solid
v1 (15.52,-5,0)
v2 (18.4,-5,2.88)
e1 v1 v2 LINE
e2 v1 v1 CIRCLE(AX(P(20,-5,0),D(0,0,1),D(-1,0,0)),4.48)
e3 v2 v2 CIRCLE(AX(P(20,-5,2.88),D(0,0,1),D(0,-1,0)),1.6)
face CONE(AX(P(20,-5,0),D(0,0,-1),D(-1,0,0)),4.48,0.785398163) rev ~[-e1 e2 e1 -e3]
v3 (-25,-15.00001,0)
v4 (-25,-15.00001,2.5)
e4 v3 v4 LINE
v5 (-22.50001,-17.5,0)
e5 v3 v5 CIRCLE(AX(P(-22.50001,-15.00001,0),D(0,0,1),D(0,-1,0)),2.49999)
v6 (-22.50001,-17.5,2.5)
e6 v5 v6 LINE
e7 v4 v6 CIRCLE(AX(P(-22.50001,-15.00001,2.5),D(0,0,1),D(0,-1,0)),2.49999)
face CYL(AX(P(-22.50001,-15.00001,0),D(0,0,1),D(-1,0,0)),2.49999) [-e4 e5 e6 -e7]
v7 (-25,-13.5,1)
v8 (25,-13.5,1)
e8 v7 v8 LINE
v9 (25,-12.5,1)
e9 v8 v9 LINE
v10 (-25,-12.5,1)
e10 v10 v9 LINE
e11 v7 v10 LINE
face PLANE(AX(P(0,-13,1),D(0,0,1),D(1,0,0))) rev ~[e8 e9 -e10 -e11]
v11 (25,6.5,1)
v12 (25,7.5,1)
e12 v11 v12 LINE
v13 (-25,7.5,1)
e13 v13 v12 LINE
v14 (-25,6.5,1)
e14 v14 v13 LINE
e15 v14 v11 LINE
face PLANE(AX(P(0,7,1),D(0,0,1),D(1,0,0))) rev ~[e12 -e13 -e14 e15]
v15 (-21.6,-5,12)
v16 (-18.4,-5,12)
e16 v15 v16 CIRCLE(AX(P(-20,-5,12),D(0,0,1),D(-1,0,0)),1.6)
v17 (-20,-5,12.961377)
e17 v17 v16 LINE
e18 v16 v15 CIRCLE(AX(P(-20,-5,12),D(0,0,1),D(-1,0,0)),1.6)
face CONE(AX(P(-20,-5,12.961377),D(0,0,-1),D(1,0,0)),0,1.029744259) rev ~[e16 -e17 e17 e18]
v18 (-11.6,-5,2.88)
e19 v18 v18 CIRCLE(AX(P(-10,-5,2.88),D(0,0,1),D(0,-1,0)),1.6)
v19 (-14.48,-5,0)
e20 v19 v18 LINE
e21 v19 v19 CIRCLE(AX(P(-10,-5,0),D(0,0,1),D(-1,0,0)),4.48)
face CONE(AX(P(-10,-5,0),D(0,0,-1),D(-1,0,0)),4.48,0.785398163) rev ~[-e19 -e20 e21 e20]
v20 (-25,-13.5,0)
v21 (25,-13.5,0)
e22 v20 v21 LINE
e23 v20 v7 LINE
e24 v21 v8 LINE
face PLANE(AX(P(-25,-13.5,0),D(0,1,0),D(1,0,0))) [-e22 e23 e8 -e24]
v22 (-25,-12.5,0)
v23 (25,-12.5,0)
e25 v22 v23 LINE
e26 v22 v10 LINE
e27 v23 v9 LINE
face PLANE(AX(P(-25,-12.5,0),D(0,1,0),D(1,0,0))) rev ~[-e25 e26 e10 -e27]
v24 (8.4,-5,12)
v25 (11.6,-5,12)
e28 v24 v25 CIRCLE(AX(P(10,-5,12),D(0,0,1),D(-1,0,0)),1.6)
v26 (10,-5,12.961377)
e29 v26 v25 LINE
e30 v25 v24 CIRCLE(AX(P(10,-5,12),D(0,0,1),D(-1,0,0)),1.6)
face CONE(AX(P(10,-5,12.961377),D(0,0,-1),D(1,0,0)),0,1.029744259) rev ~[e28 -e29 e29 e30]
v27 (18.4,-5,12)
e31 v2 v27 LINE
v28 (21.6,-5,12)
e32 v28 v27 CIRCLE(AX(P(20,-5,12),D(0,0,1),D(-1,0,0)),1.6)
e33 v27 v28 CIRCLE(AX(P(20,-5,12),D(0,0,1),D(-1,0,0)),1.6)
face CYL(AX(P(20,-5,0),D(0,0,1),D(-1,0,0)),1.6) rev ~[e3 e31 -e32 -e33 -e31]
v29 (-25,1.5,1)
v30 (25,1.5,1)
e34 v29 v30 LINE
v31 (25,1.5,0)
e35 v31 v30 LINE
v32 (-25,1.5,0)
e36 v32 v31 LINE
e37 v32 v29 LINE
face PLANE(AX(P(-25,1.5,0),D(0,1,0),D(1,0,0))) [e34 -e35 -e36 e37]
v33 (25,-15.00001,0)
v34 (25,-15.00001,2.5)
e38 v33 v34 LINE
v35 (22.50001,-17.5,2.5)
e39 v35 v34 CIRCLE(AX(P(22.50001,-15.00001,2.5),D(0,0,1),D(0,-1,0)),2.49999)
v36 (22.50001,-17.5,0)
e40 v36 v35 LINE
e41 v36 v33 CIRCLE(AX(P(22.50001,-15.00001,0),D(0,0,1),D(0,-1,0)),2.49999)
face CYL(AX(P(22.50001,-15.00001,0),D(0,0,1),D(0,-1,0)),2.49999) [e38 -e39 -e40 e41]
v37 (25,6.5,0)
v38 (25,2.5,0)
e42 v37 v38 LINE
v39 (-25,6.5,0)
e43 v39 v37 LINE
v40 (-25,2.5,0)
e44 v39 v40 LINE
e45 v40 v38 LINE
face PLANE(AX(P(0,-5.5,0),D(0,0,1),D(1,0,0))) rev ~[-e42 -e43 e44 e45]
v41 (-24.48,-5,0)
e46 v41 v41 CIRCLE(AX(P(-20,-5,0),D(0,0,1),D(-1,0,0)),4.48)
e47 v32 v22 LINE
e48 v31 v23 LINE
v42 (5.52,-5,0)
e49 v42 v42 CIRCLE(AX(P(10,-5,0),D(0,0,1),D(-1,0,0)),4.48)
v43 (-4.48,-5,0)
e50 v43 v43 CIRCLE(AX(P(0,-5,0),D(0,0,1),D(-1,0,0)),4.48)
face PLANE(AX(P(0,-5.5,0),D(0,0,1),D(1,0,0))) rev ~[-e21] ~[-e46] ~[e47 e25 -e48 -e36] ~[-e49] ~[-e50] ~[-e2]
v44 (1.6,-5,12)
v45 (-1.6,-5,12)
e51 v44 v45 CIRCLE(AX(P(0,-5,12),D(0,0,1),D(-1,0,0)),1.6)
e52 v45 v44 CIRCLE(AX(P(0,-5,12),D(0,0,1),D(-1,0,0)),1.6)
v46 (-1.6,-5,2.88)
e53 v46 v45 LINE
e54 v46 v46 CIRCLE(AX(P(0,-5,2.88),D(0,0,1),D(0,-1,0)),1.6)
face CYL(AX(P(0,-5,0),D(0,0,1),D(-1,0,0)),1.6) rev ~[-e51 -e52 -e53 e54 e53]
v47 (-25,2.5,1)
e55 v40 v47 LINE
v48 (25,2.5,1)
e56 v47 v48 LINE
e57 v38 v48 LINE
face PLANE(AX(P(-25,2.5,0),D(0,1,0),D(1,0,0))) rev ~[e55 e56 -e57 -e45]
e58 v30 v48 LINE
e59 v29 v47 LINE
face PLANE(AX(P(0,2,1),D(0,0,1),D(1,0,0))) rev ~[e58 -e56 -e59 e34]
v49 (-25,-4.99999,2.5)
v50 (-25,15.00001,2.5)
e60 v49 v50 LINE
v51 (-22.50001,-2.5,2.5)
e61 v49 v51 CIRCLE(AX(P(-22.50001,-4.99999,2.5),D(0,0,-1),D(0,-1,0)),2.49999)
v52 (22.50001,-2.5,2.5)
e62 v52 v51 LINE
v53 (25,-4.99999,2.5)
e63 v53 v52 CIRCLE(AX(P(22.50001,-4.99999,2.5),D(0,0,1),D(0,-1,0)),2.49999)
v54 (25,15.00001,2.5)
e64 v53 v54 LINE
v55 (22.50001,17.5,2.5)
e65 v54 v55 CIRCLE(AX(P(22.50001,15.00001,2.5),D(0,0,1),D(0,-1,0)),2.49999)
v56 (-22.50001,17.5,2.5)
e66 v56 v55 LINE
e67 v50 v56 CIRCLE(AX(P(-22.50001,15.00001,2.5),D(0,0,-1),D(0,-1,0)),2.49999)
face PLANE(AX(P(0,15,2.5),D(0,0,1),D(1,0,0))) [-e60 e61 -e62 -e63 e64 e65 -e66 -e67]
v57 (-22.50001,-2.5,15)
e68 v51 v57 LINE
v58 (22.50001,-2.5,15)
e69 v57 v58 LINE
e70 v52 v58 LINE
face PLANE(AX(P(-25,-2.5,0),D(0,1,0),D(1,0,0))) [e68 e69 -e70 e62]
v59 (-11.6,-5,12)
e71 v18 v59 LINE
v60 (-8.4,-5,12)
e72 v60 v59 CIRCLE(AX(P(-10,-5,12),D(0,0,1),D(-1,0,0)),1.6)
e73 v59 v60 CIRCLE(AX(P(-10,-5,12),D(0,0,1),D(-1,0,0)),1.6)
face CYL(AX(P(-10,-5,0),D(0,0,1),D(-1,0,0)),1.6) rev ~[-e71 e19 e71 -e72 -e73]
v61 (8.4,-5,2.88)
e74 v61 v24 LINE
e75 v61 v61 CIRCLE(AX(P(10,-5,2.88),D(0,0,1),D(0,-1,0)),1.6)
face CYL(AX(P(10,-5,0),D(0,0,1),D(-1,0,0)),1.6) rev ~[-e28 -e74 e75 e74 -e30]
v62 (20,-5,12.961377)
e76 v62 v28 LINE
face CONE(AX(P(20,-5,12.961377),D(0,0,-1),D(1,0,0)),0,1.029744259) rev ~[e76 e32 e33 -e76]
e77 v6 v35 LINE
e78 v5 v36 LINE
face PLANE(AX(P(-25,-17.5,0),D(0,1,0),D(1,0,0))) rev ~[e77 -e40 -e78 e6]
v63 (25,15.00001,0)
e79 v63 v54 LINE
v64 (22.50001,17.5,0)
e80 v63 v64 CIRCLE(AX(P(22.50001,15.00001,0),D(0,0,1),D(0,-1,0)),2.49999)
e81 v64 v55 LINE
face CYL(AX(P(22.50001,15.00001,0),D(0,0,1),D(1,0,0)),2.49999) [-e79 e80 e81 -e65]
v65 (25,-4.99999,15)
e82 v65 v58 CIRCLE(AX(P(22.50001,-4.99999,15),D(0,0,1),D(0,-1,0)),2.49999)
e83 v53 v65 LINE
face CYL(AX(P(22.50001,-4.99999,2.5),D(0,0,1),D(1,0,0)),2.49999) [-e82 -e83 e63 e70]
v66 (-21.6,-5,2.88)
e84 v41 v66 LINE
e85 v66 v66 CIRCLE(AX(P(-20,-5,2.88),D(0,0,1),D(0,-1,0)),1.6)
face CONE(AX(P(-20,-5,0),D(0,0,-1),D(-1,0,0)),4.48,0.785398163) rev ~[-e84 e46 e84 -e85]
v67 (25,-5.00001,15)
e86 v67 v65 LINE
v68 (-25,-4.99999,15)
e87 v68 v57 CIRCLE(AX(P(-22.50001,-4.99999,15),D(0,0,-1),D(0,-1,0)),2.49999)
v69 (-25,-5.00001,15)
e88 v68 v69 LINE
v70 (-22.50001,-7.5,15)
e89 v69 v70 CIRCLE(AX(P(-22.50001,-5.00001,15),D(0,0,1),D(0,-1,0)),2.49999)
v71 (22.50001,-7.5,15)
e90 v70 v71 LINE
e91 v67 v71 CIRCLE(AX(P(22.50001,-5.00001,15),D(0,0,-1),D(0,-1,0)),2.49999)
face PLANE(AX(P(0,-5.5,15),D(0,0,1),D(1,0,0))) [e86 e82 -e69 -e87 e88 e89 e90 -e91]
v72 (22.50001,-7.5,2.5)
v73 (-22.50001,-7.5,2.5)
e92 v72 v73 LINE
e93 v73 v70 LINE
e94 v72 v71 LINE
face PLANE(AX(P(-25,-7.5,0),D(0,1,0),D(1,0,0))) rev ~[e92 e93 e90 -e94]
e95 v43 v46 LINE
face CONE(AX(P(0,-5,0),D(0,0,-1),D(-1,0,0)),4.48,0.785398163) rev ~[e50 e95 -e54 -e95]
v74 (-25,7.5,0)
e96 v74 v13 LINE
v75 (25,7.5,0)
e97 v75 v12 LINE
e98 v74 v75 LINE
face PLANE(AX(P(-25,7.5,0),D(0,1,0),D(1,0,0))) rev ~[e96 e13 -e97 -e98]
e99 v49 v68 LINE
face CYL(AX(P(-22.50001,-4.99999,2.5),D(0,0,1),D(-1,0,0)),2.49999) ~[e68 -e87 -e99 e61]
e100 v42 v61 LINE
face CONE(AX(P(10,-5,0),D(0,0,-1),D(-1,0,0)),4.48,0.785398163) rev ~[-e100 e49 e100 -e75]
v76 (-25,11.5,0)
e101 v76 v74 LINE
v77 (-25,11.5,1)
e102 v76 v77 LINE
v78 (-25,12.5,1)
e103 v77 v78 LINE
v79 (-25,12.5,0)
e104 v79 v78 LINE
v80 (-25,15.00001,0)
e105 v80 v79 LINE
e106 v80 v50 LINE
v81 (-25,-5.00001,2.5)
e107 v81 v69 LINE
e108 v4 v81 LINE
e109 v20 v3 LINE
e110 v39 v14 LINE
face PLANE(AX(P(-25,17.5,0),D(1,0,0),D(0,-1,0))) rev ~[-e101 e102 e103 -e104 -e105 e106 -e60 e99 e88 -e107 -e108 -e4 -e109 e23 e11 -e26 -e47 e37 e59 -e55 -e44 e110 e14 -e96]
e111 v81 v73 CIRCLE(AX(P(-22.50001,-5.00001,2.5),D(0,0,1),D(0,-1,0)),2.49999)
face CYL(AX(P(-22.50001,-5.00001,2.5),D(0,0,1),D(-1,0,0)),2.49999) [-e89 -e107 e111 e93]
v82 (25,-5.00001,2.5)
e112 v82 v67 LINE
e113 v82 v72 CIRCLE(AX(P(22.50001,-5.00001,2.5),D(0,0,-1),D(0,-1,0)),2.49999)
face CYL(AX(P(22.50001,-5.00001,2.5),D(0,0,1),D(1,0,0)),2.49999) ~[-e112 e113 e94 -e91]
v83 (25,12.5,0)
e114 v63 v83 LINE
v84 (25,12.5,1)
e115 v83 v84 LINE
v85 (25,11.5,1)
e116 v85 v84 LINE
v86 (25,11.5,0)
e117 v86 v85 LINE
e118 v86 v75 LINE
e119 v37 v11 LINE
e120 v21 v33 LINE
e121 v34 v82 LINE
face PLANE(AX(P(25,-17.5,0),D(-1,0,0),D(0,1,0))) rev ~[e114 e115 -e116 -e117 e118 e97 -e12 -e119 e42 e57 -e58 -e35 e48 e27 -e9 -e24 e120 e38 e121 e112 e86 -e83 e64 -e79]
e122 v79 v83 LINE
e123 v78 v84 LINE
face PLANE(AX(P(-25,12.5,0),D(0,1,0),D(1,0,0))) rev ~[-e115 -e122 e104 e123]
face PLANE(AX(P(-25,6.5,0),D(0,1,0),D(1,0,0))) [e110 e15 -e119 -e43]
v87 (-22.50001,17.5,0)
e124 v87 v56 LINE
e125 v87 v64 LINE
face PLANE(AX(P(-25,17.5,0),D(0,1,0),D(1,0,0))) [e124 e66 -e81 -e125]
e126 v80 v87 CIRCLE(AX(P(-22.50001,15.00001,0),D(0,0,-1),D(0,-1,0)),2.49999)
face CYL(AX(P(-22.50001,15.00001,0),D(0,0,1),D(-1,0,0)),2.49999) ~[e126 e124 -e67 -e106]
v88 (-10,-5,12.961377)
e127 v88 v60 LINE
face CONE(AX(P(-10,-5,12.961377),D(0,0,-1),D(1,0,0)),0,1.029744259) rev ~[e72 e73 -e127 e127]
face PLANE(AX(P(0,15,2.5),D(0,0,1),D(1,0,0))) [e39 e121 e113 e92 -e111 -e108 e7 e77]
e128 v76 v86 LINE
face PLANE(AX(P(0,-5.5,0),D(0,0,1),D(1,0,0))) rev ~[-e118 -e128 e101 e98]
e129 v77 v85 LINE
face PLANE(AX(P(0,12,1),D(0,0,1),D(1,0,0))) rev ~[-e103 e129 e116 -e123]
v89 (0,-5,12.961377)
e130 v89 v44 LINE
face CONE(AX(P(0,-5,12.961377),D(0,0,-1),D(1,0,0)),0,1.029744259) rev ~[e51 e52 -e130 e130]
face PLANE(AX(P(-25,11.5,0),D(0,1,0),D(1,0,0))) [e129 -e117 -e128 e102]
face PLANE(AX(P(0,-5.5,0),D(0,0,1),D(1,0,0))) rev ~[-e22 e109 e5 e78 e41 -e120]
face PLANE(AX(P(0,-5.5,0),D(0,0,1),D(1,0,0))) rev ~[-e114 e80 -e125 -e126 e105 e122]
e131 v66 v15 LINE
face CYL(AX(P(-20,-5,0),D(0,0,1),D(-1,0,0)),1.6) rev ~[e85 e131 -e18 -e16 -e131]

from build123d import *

# Parameters (mm, degrees)
F0_W           = 50
F0_H           = 5
F0_H_2         = 4
F0_H_3         = 1
F1_DEPTH       = 2.5
F2_DEPTH       = 15
F3_R           = 2.49999
F4_D           = 3.2
F4_DEPTH       = 12
F4_CSINK_D     = 8.96
F4_CSINK_ANGLE = 90
F4_TIP         = 0.9613769904
F5_DEPTH       = 1


# Not quite as in the source:
# - a fillet or chamfer is up to 0.001 mm smaller than in the source, because OpenCascade refuses the exact size


with BuildPart() as f1:
    # F0 (on Top) → F1 (new body)
    with BuildSketch(Plane.XY):
        with Locations((0, 15)):
            Rectangle(F0_W, F0_H)
        with Locations((0, -5.5)):
            Rectangle(F0_W, F0_H_2)
        with Locations((0, -15.5)):
            Rectangle(F0_W, F0_H_2)
        with Locations((0, -13)):
            Rectangle(F0_W, F0_H_3)
        with Locations((0, -10.5)):
            Rectangle(F0_W, F0_H_2)
        with Locations((0, -3)):
            Rectangle(F0_W, F0_H_3)
        with Locations((0, -0.5)):
            Rectangle(F0_W, F0_H_2)
        with Locations((0, 7)):
            Rectangle(F0_W, F0_H_3)
        with Locations((0, 9.5)):
            Rectangle(F0_W, F0_H_2)
        with Locations((0, 12)):
            Rectangle(F0_W, F0_H_3)
        with Locations((0, -8)):
            Rectangle(F0_W, F0_H_3)
        with Locations((0, 2)):
            Rectangle(F0_W, F0_H_3)
        with Locations((0, 4.5)):
            Rectangle(F0_W, F0_H_2)
    extrude(amount=F1_DEPTH)

    # F0 (on Top) → F2 (join)
    with BuildSketch(Plane.XY):
        with Locations((0, -5.5)):
            Rectangle(F0_W, F0_H_2)
        with Locations((0, -3)):
            Rectangle(F0_W, F0_H_3)
    extrude(amount=F2_DEPTH)

    # F3 (radius 2.5 in the source; OpenCascade refuses exactly that, so slightly less here)
    f3_edges = [f1.edges().sort_by_distance(p)[0] for p in [
        (-25, 17.5, 1.25),
        (25, 17.5, 1.25),
        (25, -2.5, 8.75),
        (25, -7.5, 8.75),
        (-25, -2.5, 8.75),
        (-25, -7.5, 8.75),
        (-25, -17.5, 1.25),
        (25, -17.5, 1.25),
    ]]
    fillet(f3_edges, radius=F3_R)

    # F4
    with Locations(Plane(origin=(0, 0, 0), x_dir=(1, 0, 0), z_dir=(0, 0, -1))):
        with Locations((20, 5), (10, 5), (0, 5), (-10, 5), (-20, 5)):
            CounterSinkHole(F4_D / 2, F4_CSINK_D / 2, depth=F4_DEPTH, counter_sink_angle=F4_CSINK_ANGLE)
            with Locations((0, 0, -(F4_DEPTH + F4_TIP / 2))):  # 118° drill point
                Cone(0, F4_D / 2, F4_TIP, mode=Mode.SUBTRACT)

    # F0 (on Top) → F5 (cut)
    with BuildSketch(Plane.XY):
        with Locations((0, -13)):
            Rectangle(F0_W, F0_H_3)
        with Locations((0, 2)):
            Rectangle(F0_W, F0_H_3)
        with Locations((0, 7)):
            Rectangle(F0_W, F0_H_3)
        with Locations((0, 12)):
            Rectangle(F0_W, F0_H_3)
    extrude(amount=F5_DEPTH, mode=Mode.SUBTRACT)


solid = f1.part
